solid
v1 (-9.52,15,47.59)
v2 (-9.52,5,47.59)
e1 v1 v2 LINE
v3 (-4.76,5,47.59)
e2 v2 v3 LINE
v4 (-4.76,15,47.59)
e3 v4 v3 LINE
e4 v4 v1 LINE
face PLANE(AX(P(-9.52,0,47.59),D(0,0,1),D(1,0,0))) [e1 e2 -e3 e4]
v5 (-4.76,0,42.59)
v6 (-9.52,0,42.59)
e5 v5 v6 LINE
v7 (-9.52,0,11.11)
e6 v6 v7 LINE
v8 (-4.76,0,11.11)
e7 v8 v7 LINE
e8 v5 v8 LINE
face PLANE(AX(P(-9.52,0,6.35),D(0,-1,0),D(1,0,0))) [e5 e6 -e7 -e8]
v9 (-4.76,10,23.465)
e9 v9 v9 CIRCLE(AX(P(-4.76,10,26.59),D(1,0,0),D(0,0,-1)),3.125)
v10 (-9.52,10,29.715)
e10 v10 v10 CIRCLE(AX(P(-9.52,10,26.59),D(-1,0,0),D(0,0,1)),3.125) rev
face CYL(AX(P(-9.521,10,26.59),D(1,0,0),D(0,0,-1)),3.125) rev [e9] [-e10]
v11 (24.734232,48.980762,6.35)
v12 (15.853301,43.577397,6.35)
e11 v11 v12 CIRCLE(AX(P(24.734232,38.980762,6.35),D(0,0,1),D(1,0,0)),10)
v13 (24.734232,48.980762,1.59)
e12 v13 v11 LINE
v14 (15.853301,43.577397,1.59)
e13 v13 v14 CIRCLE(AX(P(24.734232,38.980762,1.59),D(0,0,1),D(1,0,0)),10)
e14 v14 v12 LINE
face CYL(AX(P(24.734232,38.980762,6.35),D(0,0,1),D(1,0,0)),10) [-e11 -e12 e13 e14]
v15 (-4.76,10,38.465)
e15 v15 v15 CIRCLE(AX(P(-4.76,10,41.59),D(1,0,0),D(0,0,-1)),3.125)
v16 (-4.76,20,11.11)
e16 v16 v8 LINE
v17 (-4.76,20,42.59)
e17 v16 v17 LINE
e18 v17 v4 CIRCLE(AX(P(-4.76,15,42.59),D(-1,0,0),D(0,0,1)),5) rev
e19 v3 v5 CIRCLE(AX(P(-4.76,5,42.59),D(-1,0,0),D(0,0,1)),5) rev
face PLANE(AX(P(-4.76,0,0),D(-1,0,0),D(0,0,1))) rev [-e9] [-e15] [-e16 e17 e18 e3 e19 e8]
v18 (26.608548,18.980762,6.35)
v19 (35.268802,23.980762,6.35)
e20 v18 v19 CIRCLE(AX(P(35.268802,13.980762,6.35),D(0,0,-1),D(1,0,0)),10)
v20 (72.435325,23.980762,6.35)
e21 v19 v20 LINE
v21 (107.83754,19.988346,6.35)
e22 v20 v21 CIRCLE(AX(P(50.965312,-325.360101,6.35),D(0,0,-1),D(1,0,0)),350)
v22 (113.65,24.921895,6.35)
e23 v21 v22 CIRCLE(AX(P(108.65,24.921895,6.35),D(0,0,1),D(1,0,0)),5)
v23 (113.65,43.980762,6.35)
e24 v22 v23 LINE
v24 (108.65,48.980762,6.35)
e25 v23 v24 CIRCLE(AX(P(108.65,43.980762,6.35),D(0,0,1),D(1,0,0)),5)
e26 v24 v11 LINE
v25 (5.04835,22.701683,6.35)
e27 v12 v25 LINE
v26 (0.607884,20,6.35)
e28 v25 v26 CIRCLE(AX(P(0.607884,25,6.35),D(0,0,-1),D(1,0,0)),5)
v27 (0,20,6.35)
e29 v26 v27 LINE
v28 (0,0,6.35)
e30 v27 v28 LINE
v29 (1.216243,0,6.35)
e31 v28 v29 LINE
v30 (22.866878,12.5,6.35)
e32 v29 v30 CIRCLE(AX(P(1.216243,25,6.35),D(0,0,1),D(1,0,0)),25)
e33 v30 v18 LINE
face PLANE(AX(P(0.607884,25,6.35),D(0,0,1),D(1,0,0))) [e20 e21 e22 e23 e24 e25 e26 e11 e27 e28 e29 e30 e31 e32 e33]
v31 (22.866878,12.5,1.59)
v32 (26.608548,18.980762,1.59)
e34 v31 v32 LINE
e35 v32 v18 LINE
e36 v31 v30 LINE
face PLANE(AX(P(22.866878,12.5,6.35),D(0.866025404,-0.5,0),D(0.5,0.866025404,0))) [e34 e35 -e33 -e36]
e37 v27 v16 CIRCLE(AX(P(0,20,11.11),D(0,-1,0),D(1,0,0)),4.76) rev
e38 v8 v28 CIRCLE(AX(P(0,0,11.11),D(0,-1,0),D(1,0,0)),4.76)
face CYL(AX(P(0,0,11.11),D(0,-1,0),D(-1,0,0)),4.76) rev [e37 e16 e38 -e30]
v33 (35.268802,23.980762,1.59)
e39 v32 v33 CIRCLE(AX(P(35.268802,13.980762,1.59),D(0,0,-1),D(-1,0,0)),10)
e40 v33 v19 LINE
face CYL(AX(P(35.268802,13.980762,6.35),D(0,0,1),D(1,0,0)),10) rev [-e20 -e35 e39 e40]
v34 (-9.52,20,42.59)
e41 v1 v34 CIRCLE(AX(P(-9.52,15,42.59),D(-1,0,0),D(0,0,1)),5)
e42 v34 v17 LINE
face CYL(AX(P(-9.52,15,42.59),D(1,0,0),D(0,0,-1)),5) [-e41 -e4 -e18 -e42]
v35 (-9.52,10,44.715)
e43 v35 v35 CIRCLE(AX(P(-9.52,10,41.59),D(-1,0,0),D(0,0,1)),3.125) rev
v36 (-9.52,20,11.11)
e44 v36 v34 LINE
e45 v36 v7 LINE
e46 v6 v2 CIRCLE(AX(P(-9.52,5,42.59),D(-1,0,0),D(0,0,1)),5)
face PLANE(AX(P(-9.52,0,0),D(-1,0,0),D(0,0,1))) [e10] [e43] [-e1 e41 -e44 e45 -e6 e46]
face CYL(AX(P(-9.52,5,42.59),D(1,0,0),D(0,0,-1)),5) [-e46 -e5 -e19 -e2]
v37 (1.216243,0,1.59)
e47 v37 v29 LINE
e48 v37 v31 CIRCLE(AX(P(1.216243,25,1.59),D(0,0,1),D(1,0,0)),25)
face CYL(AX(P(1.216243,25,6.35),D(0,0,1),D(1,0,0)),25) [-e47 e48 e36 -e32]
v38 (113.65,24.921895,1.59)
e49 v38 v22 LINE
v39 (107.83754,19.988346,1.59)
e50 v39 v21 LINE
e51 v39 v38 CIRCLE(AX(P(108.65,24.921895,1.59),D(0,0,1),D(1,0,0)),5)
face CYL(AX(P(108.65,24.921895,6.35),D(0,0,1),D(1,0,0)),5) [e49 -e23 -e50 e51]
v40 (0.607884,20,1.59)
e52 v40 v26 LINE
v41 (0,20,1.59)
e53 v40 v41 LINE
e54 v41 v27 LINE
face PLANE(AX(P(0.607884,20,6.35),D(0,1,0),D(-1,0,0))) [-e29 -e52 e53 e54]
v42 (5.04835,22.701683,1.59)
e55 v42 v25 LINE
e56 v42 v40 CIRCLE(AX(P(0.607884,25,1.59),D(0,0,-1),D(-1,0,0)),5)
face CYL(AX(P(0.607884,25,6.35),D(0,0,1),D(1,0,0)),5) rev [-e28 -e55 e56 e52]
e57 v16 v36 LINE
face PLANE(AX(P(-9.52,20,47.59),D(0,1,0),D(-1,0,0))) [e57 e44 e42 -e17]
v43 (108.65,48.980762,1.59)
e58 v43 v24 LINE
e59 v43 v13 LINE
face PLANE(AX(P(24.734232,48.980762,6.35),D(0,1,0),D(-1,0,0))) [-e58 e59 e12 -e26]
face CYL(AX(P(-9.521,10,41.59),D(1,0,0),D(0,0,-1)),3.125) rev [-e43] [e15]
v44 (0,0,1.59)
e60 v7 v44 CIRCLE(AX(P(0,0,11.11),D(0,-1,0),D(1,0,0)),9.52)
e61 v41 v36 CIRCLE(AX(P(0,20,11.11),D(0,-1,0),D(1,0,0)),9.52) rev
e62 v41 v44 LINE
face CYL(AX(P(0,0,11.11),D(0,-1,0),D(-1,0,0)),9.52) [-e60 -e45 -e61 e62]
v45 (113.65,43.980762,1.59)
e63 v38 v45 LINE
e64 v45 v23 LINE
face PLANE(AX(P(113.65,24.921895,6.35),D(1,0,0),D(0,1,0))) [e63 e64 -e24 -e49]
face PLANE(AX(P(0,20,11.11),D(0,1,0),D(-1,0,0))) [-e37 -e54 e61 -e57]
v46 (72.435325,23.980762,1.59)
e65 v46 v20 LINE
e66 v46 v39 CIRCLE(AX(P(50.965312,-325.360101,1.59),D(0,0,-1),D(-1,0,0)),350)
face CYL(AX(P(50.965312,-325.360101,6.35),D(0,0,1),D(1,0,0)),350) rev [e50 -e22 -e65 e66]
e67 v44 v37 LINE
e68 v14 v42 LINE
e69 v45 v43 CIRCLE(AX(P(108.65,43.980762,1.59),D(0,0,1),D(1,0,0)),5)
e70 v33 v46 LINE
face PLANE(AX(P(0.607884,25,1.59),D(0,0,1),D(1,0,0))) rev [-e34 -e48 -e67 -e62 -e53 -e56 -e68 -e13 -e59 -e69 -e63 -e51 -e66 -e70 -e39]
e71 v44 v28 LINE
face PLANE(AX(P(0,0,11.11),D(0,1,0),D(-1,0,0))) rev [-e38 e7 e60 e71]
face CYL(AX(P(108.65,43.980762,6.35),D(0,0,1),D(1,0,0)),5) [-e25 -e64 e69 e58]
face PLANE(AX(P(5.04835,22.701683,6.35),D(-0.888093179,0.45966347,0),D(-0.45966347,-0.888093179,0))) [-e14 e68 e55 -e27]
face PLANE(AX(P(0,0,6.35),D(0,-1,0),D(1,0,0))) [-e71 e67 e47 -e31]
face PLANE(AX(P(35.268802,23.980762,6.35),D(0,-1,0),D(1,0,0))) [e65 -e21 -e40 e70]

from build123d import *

# Parameters (mm, degrees)
SALIENTE_EXTRUIR1_DEPTH = 6.35
CONVERTIR_S_LIDO1_DEPTH = 1.59
BRIDA_DE_ARISTA1_DEPTH  = 20
REDONDEO1_R             = 5
CORTAR_EXTRUIR1_REACH   = 138.693
CROQUIS11_R             = 3.125


# Read off the part's stored shape, not the designer's step: Convertir-Sólido1
# Sheet-metal steps are written as plain solids
with BuildPart() as part:
    # Croquis1 → Saliente-Extruir1 (new body)
    with BuildSketch(Plane.XY):
        with BuildLine():
            Line((0, 0), (1.21624327, 0))
            ThreePointArc((1.21624327, 0), (13.71624327, 3.349364905), (22.866878365, 12.5))
            Line((22.866878365, 12.5), (26.608548116, 18.980762114))
            ThreePointArc((26.608548116, 18.980762114), (30.268802154, 22.641016151), (35.268802154, 23.980762114))
            Line((35.268802154, 23.980762114), (72.43532503, 23.980762114))
            ThreePointArc((72.43532503, 23.980762114), (90.187263937, 22.435296605), (107.837539609, 19.988345998))
            ThreePointArc((107.837539609, 19.988345998), (111.885560079, 21.109920556), (113.65, 24.921895239))
            Line((113.65, 24.921895239), (113.65, 43.980762114))
            ThreePointArc((113.65, 43.980762114), (112.185533906, 47.516296019), (108.65, 48.980762114))
            Line((108.65, 48.980762114), (24.734232406, 48.980762114))
            ThreePointArc((24.734232406, 48.980762114), (19.536461106, 47.523781106), (15.853300619, 43.577396815))
            Line((15.853300619, 43.577396815), (5.048349691, 22.701682649))
            ThreePointArc((5.048349691, 22.701682649), (3.206769447, 20.728490504), (0.607883797, 20))
            Line((0.607883797, 20), (0, 20))
            Line((0, 20), (0, 0))
        make_face()
    extrude(amount=SALIENTE_EXTRUIR1_DEPTH)

    # Convertir-Sólido1 outline → Convertir-Sólido1 (cut)
    with BuildSketch(Plane.XY):
        with BuildLine():
            Line((0, 20), (0, 0))
            Line((0, 0), (1.21624327, 0))
            ThreePointArc((1.21624327, 0), (13.71624327, 3.349364905), (22.866878365, 12.5))
            Line((22.866878365, 12.5), (26.608548116, 18.980762114))
            ThreePointArc((26.608548116, 18.980762114), (30.268802154, 22.641016151), (35.268802154, 23.980762114))
            Line((35.268802154, 23.980762114), (72.43532503, 23.980762114))
            ThreePointArc((72.43532503, 23.980762114), (90.187263937, 22.435296605), (107.837539609, 19.988345998))
            ThreePointArc((107.837539609, 19.988345998), (111.885560079, 21.109920556), (113.65, 24.921895239))
            Line((113.65, 24.921895239), (113.65, 43.980762114))
            ThreePointArc((113.65, 43.980762114), (112.185533906, 47.516296019), (108.65, 48.980762114))
            Line((108.65, 48.980762114), (24.734232406, 48.980762114))
            ThreePointArc((24.734232406, 48.980762114), (19.536461106, 47.523781106), (15.853300619, 43.577396815))
            Line((15.853300619, 43.577396815), (5.048349691, 22.701682649))
            ThreePointArc((5.048349691, 22.701682649), (3.206769447, 20.728490504), (0.607883797, 20))
            Line((0.607883797, 20), (0, 20))
        make_face()
    extrude(amount=CONVERTIR_S_LIDO1_DEPTH, mode=Mode.SUBTRACT)

    # Brida de arista1 section (across the edge) → Brida de arista1 (add)
    with BuildSketch(Plane(origin=(-4.76, 20, 6.35), x_dir=(1, 0, 0), z_dir=(0, -1, 0))):
        with BuildLine():
            Line((-4.76, 4.76), (-4.76, 41.24))
            Line((-4.76, 41.24), (0, 41.24))
            Line((0, 41.24), (0, 4.76))
            ThreePointArc((0, 4.76), (1.394171722, 1.394171722), (4.76, 0))
            Line((4.76, 0), (4.76, -4.76))
            ThreePointArc((4.76, -4.76), (-1.971656557, -1.971656557), (-4.76, 4.76))
        make_face()
    extrude(amount=BRIDA_DE_ARISTA1_DEPTH)

    # Redondeo1
    redondeo1_edges = [part.edges().sort_by_distance(p)[0] for p in [
        (-7.14, 20, 47.59),
        (-7.14, 0, 47.59),
    ]]
    fillet(redondeo1_edges, radius=REDONDEO1_R)

    # Croquis11 → Cortar-Extruir1 (cut, up to next)
    with BuildSketch(Plane(origin=(-4.76, 0, 0), x_dir=(0, 0, -1), z_dir=(1, 0, 0)), mode=Mode.PRIVATE) as cortar_extruir1_sk1:
        with Locations((-41.59, 10)):
            Circle(CROQUIS11_R)
    cortar_extruir1_tool1 = extrude(cortar_extruir1_sk1.sketch, amount=-CORTAR_EXTRUIR1_REACH, mode=Mode.PRIVATE) & part.part
    # Croquis11 → Cortar-Extruir1 (cut, up to next)
    with BuildSketch(Plane(origin=(-4.76, 0, 0), x_dir=(0, 0, -1), z_dir=(1, 0, 0)), mode=Mode.PRIVATE) as cortar_extruir1_sk2:
        with Locations((-26.59, 10)):
            Circle(CROQUIS11_R)
    cortar_extruir1_tool2 = extrude(cortar_extruir1_sk2.sketch, amount=-CORTAR_EXTRUIR1_REACH, mode=Mode.PRIVATE) & part.part
    add(cortar_extruir1_tool1.solids().sort_by_distance((-4.76, 10, 41.59))[0], mode=Mode.SUBTRACT)
    add(cortar_extruir1_tool2.solids().sort_by_distance((-4.76, 10, 26.59))[0], mode=Mode.SUBTRACT)


solid = part.part
